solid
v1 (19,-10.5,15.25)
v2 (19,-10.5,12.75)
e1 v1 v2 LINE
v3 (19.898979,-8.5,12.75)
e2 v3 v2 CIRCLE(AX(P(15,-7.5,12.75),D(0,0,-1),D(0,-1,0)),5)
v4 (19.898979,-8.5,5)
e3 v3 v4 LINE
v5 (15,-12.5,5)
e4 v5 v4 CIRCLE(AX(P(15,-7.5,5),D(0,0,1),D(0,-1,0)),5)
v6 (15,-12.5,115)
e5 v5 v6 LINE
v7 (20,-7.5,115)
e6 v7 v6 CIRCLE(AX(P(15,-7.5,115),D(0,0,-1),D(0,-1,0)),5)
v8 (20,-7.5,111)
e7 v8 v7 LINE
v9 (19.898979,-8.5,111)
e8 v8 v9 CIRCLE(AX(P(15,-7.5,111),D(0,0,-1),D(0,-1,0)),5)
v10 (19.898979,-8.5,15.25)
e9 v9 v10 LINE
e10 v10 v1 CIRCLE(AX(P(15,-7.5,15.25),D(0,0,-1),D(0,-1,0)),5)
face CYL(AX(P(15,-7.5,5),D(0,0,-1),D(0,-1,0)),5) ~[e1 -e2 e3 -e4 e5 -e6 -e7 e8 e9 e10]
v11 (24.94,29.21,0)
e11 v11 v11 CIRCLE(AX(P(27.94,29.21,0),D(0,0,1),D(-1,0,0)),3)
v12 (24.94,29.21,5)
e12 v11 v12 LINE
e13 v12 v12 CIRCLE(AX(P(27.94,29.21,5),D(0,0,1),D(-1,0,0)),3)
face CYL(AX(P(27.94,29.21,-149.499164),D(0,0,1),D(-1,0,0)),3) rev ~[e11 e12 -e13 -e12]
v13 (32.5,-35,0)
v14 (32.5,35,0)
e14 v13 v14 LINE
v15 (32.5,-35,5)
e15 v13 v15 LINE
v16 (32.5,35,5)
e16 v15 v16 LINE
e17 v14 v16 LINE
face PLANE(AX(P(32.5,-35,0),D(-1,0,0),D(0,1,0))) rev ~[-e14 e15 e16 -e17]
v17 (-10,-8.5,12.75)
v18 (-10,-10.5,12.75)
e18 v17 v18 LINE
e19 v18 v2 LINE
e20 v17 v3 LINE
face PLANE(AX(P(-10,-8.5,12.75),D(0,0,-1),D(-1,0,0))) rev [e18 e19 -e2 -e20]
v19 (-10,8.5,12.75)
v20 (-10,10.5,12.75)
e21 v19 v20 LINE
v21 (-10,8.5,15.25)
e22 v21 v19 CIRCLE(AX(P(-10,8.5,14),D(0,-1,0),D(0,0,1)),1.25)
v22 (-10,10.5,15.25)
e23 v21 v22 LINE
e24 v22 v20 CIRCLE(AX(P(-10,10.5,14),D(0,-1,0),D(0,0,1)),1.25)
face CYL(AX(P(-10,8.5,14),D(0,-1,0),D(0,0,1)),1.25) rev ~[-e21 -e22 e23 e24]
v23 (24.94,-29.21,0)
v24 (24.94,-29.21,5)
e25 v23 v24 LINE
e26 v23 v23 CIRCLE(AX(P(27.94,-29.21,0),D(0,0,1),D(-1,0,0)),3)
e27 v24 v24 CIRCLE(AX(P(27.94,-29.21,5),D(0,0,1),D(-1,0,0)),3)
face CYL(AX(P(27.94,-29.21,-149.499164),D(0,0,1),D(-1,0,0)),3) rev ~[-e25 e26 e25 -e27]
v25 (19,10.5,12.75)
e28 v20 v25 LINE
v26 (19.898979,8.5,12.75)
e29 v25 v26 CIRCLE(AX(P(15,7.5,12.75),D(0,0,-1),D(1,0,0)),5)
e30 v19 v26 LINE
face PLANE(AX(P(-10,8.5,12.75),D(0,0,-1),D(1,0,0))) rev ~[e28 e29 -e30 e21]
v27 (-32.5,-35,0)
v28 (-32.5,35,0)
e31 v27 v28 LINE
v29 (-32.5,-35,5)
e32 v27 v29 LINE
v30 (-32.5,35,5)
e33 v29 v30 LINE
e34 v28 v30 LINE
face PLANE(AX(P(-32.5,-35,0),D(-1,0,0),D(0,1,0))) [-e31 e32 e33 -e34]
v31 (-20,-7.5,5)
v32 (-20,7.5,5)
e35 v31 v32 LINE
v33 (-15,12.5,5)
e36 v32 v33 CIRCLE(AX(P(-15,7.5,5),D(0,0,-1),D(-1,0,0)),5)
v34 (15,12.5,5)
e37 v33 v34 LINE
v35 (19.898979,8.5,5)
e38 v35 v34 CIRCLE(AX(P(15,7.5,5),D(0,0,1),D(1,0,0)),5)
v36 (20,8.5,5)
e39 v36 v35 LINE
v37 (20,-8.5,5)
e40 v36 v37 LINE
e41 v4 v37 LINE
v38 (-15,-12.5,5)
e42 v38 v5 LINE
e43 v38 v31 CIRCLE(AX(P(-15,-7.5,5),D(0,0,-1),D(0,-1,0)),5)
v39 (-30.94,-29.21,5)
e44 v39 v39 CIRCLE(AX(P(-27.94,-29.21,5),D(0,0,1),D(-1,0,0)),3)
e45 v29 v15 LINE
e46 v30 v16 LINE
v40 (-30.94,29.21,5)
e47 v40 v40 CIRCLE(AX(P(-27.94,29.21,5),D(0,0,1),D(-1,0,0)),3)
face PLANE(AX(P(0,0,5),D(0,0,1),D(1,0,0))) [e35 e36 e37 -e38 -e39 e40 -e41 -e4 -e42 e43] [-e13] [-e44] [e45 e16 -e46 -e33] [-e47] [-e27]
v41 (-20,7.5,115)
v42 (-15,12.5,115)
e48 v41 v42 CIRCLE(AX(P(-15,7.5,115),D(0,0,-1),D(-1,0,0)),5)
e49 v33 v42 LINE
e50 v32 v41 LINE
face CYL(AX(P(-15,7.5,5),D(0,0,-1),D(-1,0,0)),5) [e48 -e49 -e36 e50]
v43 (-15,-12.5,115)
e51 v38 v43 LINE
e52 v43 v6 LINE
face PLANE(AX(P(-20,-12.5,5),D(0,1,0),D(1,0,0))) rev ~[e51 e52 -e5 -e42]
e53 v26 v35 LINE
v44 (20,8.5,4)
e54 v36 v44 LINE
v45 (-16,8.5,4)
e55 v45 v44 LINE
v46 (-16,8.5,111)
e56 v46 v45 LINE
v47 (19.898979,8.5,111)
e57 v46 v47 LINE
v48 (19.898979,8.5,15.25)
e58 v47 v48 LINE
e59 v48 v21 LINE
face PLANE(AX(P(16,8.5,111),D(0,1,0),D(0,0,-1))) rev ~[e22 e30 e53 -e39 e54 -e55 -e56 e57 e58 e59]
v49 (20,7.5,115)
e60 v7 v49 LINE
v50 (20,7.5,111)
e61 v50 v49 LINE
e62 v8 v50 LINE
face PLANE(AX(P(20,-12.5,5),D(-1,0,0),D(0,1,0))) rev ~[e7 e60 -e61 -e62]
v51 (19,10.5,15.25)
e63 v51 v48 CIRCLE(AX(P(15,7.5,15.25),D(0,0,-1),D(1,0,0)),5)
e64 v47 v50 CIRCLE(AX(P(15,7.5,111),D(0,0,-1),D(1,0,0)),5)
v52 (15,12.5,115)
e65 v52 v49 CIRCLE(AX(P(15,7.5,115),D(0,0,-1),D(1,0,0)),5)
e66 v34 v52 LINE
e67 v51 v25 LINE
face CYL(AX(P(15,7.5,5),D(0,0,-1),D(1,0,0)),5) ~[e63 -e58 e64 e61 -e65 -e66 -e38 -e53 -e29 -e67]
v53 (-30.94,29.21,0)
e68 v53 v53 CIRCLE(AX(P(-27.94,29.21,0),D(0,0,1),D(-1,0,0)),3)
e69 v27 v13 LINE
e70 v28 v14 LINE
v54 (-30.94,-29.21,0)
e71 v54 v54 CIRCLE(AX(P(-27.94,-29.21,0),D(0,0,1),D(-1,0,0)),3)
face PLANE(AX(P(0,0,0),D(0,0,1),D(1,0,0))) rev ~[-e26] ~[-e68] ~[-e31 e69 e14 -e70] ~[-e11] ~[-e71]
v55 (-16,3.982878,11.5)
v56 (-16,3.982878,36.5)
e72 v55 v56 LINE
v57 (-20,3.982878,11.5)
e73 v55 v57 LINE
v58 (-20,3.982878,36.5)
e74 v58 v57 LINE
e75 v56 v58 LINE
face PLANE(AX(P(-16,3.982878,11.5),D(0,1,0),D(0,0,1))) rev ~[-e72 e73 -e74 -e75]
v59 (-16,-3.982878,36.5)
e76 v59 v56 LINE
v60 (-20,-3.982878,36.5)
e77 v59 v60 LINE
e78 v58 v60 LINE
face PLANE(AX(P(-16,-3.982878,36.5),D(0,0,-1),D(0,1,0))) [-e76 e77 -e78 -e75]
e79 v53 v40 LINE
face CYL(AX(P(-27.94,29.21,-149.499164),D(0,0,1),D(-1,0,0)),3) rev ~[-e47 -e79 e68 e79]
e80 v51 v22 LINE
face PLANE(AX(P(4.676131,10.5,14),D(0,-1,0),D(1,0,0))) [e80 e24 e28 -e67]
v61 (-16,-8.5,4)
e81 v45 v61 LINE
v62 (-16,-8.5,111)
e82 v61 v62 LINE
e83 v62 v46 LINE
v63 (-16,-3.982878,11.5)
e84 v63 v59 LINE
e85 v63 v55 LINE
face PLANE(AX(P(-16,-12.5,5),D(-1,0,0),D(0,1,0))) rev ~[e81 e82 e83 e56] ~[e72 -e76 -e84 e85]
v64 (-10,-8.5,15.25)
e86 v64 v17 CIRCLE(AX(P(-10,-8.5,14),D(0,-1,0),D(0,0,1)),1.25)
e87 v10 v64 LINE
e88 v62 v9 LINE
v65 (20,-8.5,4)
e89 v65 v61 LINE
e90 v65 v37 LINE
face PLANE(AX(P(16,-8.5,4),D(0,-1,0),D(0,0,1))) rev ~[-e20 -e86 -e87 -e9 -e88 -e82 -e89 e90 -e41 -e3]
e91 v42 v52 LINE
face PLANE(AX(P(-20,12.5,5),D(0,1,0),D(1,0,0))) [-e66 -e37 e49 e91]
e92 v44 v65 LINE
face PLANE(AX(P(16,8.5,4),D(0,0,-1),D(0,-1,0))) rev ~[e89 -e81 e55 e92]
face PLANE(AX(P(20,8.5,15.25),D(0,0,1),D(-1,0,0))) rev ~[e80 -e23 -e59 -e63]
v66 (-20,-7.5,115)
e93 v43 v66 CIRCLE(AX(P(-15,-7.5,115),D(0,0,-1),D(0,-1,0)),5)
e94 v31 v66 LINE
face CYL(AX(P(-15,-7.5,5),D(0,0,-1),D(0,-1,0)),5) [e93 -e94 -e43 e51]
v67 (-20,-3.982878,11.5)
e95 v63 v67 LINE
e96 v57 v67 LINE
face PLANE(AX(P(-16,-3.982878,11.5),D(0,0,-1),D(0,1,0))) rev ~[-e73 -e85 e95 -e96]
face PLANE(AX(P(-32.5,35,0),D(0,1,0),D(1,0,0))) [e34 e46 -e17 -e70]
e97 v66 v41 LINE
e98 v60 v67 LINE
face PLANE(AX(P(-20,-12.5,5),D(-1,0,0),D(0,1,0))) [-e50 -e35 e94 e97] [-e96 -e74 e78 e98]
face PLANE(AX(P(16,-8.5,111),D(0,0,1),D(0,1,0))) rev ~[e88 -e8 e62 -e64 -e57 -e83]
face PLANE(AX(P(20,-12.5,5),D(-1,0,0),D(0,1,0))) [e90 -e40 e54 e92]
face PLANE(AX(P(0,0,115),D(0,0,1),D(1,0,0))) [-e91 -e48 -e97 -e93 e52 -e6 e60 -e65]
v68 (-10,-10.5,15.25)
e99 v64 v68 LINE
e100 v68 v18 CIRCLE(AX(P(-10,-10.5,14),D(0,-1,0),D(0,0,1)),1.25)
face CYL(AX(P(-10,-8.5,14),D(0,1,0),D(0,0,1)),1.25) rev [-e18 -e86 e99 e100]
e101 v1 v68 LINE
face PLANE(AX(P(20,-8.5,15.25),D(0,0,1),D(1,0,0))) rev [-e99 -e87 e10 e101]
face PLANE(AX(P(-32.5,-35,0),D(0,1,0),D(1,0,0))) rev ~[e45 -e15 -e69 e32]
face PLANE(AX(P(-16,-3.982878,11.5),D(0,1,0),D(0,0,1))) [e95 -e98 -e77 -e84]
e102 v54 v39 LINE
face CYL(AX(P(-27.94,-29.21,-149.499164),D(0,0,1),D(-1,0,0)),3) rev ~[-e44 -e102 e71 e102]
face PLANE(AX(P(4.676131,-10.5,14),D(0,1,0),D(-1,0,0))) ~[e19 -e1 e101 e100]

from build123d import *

# Parameters (mm, degrees)
F0_W         = 65
F0_H         = 70
F1_DEPTH     = 5
F2_W         = 40
F2_H         = 25
F3_DEPTH     = 110
F5_D         = 6
F6_T         = -4
F7_W         = 7.9657556489
F7_H         = 25
F8_DEPTH     = 25
F10_DEPTH    = 2
F11_T1_DEPTH = 122.5


# Not quite as in the source:
# - a fillet or chamfer that OpenCascade refuses, or shapes differently, is made with other operations: its cross-section is extruded or revolved along the edge and cut away or added
# - a pattern or mirror of a feature is missing from the dataset's text; its kind, count and spacing are read off the source's solid


with BuildPart() as f1:
    # F0 (on Top) → F1 (new body)
    with BuildSketch(Plane.XY):
        Rectangle(F0_W, F0_H)
    extrude(amount=F1_DEPTH)

    # F2 (on face) → F3 (join)
    with BuildSketch(Plane.XY.offset(5)):
        Rectangle(F2_W, F2_H)
    extrude(amount=F3_DEPTH)

    # F5 (through all)
    with Locations(Plane(origin=(0, 0, 0), x_dir=(1, 0, 0), z_dir=(0, 0, -1))):
        with Locations((-27.94, 29.21), (27.94, 29.21), (27.94, -29.21), (-27.94, -29.21)):
            Hole(F5_D / 2)

    # F6: a shell. OpenCascade refuses it in one call, so the cavity is built on its own and cut out:
    # the body offset inwards by the wall thickness, plus a prism from it out through each open face.
    f6_core = offset(f1.part, amount=F6_T, kind=Kind.INTERSECTION, mode=Mode.PRIVATE)
    f6_exits = [f6_core.faces().sort_by_distance(p)[0] for p in [
        (16, 0, 57.5),
    ]]
    add(f6_core, mode=Mode.SUBTRACT)
    extrude(f6_exits, amount=-F6_T, mode=Mode.SUBTRACT)

    # F7 (on face) → F8 (cut)
    with BuildSketch(Plane.YZ.offset(-16)):
        with Locations((0, 24)):
            Rectangle(F7_W, F7_H)
    extrude(amount=-F8_DEPTH, mode=Mode.SUBTRACT)

    # F9 (on face) → F10 (cut)
    with BuildSketch(Plane.XZ.offset(-8.5)):
        with BuildLine():
            Line((20, 14), (20, 15.25))
            Line((20, 15.25), (-10, 15.25))
            ThreePointArc((-10, 15.25), (-11.25, 14), (-10, 12.75))
            Line((-10, 12.75), (20, 12.75))
            Line((20, 12.75), (20, 14))
        make_face()
    f10 = extrude(amount=-F10_DEPTH, mode=Mode.SUBTRACT)

    # F10_copies: F10 across plane
    add(f10.mirror(Plane(origin=(0, 0, 0), x_dir=(0, 0, -1), z_dir=(0, -1, 0))), mode=Mode.SUBTRACT)

    # F11: fillet of radius 5 on 4 edges, made by hand

    # F11_s2 → F11_t1 (cut)
    with BuildSketch(Plane.XY.offset(5)):
        with BuildLine():
            ThreePointArc((-15, -12.5), (-18.5355339059, -11.0355339059), (-20, -7.5))
            Line((-20, -7.5), (-20, -12.5))
            Line((-20, -12.5), (-15, -12.5))
        make_face()
        with BuildLine():
            ThreePointArc((-20, 7.5), (-18.5355339059, 11.0355339059), (-15, 12.5))
            Line((-15, 12.5), (-20, 12.5))
            Line((-20, 12.5), (-20, 7.5))
        make_face()
        with BuildLine():
            ThreePointArc((15, -12.5), (18.5355339059, -11.0355339059), (20, -7.5))
            Line((20, -7.5), (20, -12.5))
            Line((20, -12.5), (15, -12.5))
        make_face()
        with BuildLine():
            ThreePointArc((20, 7.5), (18.5355339059, 11.0355339059), (15, 12.5))
            Line((15, 12.5), (20, 12.5))
            Line((20, 12.5), (20, 7.5))
        make_face()
    extrude(amount=F11_T1_DEPTH, mode=Mode.SUBTRACT)


solid = f1.part
